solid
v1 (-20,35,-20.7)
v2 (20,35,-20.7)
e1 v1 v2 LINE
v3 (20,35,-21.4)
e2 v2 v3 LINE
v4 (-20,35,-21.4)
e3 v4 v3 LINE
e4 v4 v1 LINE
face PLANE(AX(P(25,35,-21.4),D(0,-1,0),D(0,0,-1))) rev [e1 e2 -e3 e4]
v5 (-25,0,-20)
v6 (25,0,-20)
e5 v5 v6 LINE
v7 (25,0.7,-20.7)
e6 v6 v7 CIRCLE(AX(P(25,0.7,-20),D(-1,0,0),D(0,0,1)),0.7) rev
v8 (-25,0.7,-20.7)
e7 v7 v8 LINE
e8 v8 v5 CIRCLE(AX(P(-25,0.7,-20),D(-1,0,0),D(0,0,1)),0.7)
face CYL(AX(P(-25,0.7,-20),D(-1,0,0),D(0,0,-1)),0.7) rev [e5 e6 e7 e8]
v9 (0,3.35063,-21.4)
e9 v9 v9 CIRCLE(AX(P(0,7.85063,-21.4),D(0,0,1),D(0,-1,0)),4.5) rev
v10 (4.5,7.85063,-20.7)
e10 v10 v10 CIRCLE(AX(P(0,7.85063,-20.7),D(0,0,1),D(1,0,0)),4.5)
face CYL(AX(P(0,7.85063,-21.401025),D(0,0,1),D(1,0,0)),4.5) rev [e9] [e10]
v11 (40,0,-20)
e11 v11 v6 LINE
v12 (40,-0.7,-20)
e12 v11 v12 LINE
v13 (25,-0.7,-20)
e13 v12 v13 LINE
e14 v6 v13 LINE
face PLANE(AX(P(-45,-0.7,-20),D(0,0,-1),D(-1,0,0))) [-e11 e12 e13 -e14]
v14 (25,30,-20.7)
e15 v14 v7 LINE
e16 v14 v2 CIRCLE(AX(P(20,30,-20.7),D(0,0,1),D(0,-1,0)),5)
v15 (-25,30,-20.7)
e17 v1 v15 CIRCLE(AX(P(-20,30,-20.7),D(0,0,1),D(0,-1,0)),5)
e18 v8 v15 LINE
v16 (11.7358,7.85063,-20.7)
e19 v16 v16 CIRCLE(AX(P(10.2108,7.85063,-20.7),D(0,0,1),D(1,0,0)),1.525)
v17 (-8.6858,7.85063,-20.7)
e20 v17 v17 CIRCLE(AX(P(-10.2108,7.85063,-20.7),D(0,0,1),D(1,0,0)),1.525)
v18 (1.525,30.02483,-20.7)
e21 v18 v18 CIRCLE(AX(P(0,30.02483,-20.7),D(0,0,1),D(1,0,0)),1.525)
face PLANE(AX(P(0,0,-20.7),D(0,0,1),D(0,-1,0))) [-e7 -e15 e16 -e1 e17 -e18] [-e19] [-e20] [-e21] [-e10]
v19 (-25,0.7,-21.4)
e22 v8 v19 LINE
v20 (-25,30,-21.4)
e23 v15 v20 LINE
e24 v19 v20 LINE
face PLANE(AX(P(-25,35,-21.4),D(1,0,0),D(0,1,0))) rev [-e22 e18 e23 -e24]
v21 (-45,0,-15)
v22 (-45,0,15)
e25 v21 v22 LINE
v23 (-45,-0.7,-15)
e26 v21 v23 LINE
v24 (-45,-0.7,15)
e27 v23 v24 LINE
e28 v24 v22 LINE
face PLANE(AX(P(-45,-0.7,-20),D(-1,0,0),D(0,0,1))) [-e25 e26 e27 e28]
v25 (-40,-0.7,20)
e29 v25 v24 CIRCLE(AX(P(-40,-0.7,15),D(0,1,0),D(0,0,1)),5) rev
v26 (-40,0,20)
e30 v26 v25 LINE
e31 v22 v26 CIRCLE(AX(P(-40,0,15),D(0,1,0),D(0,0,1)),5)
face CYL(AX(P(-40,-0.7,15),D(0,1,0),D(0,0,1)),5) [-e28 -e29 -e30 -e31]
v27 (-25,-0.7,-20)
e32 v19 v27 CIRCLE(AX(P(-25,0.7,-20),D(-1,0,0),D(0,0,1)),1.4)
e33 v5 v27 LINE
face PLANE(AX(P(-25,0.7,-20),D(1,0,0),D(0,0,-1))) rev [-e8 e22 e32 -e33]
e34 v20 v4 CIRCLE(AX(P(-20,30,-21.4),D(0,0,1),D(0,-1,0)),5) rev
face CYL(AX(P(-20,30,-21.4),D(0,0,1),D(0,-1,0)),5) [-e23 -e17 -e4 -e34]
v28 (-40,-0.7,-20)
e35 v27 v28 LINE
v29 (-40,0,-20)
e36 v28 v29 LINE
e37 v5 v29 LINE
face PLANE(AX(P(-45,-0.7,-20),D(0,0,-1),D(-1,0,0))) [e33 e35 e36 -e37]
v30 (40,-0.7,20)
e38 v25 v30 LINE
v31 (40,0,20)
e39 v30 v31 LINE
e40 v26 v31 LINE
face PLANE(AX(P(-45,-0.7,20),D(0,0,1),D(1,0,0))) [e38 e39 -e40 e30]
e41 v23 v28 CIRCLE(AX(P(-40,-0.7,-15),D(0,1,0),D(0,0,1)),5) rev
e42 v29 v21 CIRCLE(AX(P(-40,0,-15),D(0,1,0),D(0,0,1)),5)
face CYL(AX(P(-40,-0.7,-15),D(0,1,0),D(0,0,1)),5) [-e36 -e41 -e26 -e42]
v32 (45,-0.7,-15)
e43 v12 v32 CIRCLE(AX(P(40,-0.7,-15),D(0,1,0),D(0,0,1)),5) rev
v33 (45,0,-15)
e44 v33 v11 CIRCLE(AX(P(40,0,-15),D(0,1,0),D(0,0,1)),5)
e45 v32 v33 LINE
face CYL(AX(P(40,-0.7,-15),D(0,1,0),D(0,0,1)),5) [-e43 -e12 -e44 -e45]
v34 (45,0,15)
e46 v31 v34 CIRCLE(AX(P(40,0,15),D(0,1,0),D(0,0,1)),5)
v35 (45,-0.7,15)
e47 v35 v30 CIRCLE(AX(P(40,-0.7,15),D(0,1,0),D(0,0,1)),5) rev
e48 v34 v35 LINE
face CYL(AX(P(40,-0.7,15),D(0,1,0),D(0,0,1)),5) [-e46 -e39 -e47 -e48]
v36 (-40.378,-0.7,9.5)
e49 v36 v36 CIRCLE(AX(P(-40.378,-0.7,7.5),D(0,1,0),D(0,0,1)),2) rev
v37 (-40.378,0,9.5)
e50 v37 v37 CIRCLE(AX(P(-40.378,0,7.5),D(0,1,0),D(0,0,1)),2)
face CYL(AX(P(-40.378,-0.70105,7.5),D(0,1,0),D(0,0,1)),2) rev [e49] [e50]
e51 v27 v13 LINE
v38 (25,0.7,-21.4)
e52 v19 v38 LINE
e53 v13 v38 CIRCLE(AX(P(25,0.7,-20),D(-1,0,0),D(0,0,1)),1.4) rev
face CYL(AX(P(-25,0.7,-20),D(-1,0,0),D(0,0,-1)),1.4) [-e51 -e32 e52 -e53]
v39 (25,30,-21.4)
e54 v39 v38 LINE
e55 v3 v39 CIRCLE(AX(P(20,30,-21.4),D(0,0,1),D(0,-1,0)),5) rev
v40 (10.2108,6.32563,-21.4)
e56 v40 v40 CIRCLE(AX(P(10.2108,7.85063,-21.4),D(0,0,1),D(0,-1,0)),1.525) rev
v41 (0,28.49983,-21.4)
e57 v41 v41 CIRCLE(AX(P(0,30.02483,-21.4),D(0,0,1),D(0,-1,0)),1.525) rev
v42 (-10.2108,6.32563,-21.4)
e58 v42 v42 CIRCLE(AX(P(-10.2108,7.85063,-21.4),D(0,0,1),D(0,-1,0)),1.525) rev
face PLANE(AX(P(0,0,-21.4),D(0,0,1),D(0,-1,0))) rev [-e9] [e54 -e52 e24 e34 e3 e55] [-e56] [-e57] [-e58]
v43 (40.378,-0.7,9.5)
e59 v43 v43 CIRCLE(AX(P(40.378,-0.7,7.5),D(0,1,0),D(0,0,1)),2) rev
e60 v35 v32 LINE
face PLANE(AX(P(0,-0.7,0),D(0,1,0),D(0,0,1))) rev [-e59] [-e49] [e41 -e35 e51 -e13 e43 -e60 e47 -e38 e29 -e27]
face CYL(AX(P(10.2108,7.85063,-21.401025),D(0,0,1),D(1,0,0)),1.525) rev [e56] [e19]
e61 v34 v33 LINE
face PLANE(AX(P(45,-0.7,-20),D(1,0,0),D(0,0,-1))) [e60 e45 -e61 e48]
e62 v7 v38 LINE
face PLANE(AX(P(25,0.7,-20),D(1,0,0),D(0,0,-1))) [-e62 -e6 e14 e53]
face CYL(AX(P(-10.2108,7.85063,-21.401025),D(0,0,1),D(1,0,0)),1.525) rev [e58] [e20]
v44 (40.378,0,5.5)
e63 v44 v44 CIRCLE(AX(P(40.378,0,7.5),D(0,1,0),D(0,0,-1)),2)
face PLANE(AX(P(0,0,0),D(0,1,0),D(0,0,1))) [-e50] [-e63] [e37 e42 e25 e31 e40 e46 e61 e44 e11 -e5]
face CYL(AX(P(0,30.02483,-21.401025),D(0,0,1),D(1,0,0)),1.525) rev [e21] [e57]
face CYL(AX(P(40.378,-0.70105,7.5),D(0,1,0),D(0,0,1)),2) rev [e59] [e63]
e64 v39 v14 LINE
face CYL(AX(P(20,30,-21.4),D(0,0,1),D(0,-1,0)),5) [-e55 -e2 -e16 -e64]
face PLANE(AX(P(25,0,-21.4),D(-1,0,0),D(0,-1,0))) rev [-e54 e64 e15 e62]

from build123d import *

# Parameters (mm, degrees)
SKETCH1_W             = 90
SKETCH1_H             = 40
BASE_FLANGE1_DEPTH    = 0.7
EDGE_FLANGE1_DEPTH    = 50
CUT_EXTRUDE1_REACH    = 72.046
SKETCH7_R             = 1.525
CUT_EXTRUDE2_REACH    = 72.046
SKETCH8_R             = 4.5
CUT_EXTRUDE4_REACH    = 62.893
SKETCH10_R            = 2
BREAK_CORNER6_START   = -21.4
BREAK_CORNER6_DEPTH   = 0.7
BREAK_CORNER6_START_2 = -0.7
BREAK_CORNER6_2_DEPTH = 0.7


# Read off the part's stored shape, not the designer's step: Break-Corner6
# Sheet-metal steps are written as plain solids
with BuildPart() as part:
    # Sketch1 → Base-Flange1 (new body)
    with BuildSketch(Plane(origin=(0, 0, 0), x_dir=(1, 0, 0), z_dir=(0, 1, 0))):
        Rectangle(SKETCH1_W, SKETCH1_H)
    extrude(amount=-BASE_FLANGE1_DEPTH)

    # Edge-Flange1 section (across the edge) → Edge-Flange1 (add)
    with BuildSketch(Plane(origin=(25, 0, -20.7), x_dir=(0, 0, 1), z_dir=(-1, 0, 0))):
        with BuildLine():
            Line((-0.7, 0.7), (-0.7, 35))
            Line((-0.7, 35), (0, 35))
            Line((0, 35), (0, 0.7))
            ThreePointArc((0, 0.7), (0.205025253, 0.205025253), (0.7, 0))
            Line((0.7, 0), (0.7, -0.7))
            ThreePointArc((0.7, -0.7), (-0.289949494, -0.289949494), (-0.7, 0.7))
        make_face()
    extrude(amount=EDGE_FLANGE1_DEPTH)

    # Sketch7 → Cut-Extrude1 (cut, up to next)
    with BuildSketch(Plane.XY.offset(-20.7), mode=Mode.PRIVATE) as cut_extrude1_sk1:
        with Locations((0, 30.02483)):
            Circle(SKETCH7_R)
    cut_extrude1_tool1 = extrude(cut_extrude1_sk1.sketch, amount=-CUT_EXTRUDE1_REACH, mode=Mode.PRIVATE) & part.part
    # Sketch7 → Cut-Extrude1 (cut, up to next)
    with BuildSketch(Plane.XY.offset(-20.7), mode=Mode.PRIVATE) as cut_extrude1_sk2:
        with Locations((10.2108, 7.85063)):
            Circle(SKETCH7_R)
    cut_extrude1_tool2 = extrude(cut_extrude1_sk2.sketch, amount=-CUT_EXTRUDE1_REACH, mode=Mode.PRIVATE) & part.part
    # Sketch7 → Cut-Extrude1 (cut, up to next)
    with BuildSketch(Plane.XY.offset(-20.7), mode=Mode.PRIVATE) as cut_extrude1_sk3:
        with Locations((-10.2108, 7.85063)):
            Circle(SKETCH7_R)
    cut_extrude1_tool3 = extrude(cut_extrude1_sk3.sketch, amount=-CUT_EXTRUDE1_REACH, mode=Mode.PRIVATE) & part.part
    add(cut_extrude1_tool1.solids().sort_by_distance((0, 30.02483, -20.7))[0], mode=Mode.SUBTRACT)
    add(cut_extrude1_tool2.solids().sort_by_distance((10.2108, 7.85063, -20.7))[0], mode=Mode.SUBTRACT)
    add(cut_extrude1_tool3.solids().sort_by_distance((-10.2108, 7.85063, -20.7))[0], mode=Mode.SUBTRACT)

    # Sketch8 → Cut-Extrude2 (cut, up to next)
    with BuildSketch(Plane.XY.offset(-20.7), mode=Mode.PRIVATE) as cut_extrude2_sk1:
        with Locations((0, 7.85063)):
            Circle(SKETCH8_R)
    cut_extrude2_tool1 = extrude(cut_extrude2_sk1.sketch, amount=-CUT_EXTRUDE2_REACH, mode=Mode.PRIVATE) & part.part
    add(cut_extrude2_tool1.solids().sort_by_distance((0, 7.85063, -20.7))[0], mode=Mode.SUBTRACT)

    # Sketch10 → Cut-Extrude4 (cut, up to next)
    with BuildSketch(Plane(origin=(0, 0, 0), x_dir=(1, 0, 0), z_dir=(0, 1, 0)), mode=Mode.PRIVATE) as cut_extrude4_sk1:
        with Locations(Location((-40.378, -7.5, 0), (0, 0, 270))):
            Circle(SKETCH10_R)
    cut_extrude4_tool1 = extrude(cut_extrude4_sk1.sketch, amount=-CUT_EXTRUDE4_REACH, mode=Mode.PRIVATE) & part.part
    # Sketch10 → Cut-Extrude4 (cut, up to next)
    with BuildSketch(Plane(origin=(0, 0, 0), x_dir=(1, 0, 0), z_dir=(0, 1, 0)), mode=Mode.PRIVATE) as cut_extrude4_sk2:
        with Locations(Location((40.378, -7.5, 0), (0, 0, 270))):
            Circle(SKETCH10_R)
    cut_extrude4_tool2 = extrude(cut_extrude4_sk2.sketch, amount=-CUT_EXTRUDE4_REACH, mode=Mode.PRIVATE) & part.part
    add(cut_extrude4_tool1.solids().sort_by_distance((-40.378, 0, 7.5))[0], mode=Mode.SUBTRACT)
    add(cut_extrude4_tool2.solids().sort_by_distance((40.378, 0, 7.5))[0], mode=Mode.SUBTRACT)

    # Break-Corner6 outline → Break-Corner6 (cut)
    with BuildSketch(Plane.XY.offset(BREAK_CORNER6_START)):
        with BuildLine():
            ThreePointArc((-25, 30), (-23.535533906, 33.535533906), (-20, 35))
            Line((-20, 35), (-25, 35))
            Line((-25, 35), (-25, 30))
        make_face()
        with BuildLine():
            ThreePointArc((20, 35), (23.535533906, 33.535533906), (25, 30))
            Line((25, 30), (25, 35))
            Line((25, 35), (20, 35))
        make_face()
    extrude(amount=BREAK_CORNER6_DEPTH, mode=Mode.SUBTRACT)

    # Break-Corner6 2 outline → Break-Corner6 2 (cut)
    with BuildSketch(Plane(origin=(0, 0, 0), x_dir=(1, 0, 0), z_dir=(0, 1, 0)).offset(BREAK_CORNER6_START_2)):
        with BuildLine():
            ThreePointArc((40, 20), (43.535533906, 18.535533906), (45, 15))
            Line((45, 15), (45, 20))
            Line((45, 20), (40, 20))
        make_face()
        with BuildLine():
            Line((-45, 20), (-45, 15))
            ThreePointArc((-45, 15), (-43.535533906, 18.535533906), (-40, 20))
            Line((-40, 20), (-45, 20))
        make_face()
        with BuildLine():
            Line((-45, -20), (-40, -20))
            ThreePointArc((-40, -20), (-43.535533906, -18.535533906), (-45, -15))
            Line((-45, -15), (-45, -20))
        make_face()
        with BuildLine():
            ThreePointArc((45, -15), (43.535533906, -18.535533906), (40, -20))
            Line((40, -20), (45, -20))
            Line((45, -20), (45, -15))
        make_face()
    extrude(amount=BREAK_CORNER6_2_DEPTH, mode=Mode.SUBTRACT)


solid = part.part
